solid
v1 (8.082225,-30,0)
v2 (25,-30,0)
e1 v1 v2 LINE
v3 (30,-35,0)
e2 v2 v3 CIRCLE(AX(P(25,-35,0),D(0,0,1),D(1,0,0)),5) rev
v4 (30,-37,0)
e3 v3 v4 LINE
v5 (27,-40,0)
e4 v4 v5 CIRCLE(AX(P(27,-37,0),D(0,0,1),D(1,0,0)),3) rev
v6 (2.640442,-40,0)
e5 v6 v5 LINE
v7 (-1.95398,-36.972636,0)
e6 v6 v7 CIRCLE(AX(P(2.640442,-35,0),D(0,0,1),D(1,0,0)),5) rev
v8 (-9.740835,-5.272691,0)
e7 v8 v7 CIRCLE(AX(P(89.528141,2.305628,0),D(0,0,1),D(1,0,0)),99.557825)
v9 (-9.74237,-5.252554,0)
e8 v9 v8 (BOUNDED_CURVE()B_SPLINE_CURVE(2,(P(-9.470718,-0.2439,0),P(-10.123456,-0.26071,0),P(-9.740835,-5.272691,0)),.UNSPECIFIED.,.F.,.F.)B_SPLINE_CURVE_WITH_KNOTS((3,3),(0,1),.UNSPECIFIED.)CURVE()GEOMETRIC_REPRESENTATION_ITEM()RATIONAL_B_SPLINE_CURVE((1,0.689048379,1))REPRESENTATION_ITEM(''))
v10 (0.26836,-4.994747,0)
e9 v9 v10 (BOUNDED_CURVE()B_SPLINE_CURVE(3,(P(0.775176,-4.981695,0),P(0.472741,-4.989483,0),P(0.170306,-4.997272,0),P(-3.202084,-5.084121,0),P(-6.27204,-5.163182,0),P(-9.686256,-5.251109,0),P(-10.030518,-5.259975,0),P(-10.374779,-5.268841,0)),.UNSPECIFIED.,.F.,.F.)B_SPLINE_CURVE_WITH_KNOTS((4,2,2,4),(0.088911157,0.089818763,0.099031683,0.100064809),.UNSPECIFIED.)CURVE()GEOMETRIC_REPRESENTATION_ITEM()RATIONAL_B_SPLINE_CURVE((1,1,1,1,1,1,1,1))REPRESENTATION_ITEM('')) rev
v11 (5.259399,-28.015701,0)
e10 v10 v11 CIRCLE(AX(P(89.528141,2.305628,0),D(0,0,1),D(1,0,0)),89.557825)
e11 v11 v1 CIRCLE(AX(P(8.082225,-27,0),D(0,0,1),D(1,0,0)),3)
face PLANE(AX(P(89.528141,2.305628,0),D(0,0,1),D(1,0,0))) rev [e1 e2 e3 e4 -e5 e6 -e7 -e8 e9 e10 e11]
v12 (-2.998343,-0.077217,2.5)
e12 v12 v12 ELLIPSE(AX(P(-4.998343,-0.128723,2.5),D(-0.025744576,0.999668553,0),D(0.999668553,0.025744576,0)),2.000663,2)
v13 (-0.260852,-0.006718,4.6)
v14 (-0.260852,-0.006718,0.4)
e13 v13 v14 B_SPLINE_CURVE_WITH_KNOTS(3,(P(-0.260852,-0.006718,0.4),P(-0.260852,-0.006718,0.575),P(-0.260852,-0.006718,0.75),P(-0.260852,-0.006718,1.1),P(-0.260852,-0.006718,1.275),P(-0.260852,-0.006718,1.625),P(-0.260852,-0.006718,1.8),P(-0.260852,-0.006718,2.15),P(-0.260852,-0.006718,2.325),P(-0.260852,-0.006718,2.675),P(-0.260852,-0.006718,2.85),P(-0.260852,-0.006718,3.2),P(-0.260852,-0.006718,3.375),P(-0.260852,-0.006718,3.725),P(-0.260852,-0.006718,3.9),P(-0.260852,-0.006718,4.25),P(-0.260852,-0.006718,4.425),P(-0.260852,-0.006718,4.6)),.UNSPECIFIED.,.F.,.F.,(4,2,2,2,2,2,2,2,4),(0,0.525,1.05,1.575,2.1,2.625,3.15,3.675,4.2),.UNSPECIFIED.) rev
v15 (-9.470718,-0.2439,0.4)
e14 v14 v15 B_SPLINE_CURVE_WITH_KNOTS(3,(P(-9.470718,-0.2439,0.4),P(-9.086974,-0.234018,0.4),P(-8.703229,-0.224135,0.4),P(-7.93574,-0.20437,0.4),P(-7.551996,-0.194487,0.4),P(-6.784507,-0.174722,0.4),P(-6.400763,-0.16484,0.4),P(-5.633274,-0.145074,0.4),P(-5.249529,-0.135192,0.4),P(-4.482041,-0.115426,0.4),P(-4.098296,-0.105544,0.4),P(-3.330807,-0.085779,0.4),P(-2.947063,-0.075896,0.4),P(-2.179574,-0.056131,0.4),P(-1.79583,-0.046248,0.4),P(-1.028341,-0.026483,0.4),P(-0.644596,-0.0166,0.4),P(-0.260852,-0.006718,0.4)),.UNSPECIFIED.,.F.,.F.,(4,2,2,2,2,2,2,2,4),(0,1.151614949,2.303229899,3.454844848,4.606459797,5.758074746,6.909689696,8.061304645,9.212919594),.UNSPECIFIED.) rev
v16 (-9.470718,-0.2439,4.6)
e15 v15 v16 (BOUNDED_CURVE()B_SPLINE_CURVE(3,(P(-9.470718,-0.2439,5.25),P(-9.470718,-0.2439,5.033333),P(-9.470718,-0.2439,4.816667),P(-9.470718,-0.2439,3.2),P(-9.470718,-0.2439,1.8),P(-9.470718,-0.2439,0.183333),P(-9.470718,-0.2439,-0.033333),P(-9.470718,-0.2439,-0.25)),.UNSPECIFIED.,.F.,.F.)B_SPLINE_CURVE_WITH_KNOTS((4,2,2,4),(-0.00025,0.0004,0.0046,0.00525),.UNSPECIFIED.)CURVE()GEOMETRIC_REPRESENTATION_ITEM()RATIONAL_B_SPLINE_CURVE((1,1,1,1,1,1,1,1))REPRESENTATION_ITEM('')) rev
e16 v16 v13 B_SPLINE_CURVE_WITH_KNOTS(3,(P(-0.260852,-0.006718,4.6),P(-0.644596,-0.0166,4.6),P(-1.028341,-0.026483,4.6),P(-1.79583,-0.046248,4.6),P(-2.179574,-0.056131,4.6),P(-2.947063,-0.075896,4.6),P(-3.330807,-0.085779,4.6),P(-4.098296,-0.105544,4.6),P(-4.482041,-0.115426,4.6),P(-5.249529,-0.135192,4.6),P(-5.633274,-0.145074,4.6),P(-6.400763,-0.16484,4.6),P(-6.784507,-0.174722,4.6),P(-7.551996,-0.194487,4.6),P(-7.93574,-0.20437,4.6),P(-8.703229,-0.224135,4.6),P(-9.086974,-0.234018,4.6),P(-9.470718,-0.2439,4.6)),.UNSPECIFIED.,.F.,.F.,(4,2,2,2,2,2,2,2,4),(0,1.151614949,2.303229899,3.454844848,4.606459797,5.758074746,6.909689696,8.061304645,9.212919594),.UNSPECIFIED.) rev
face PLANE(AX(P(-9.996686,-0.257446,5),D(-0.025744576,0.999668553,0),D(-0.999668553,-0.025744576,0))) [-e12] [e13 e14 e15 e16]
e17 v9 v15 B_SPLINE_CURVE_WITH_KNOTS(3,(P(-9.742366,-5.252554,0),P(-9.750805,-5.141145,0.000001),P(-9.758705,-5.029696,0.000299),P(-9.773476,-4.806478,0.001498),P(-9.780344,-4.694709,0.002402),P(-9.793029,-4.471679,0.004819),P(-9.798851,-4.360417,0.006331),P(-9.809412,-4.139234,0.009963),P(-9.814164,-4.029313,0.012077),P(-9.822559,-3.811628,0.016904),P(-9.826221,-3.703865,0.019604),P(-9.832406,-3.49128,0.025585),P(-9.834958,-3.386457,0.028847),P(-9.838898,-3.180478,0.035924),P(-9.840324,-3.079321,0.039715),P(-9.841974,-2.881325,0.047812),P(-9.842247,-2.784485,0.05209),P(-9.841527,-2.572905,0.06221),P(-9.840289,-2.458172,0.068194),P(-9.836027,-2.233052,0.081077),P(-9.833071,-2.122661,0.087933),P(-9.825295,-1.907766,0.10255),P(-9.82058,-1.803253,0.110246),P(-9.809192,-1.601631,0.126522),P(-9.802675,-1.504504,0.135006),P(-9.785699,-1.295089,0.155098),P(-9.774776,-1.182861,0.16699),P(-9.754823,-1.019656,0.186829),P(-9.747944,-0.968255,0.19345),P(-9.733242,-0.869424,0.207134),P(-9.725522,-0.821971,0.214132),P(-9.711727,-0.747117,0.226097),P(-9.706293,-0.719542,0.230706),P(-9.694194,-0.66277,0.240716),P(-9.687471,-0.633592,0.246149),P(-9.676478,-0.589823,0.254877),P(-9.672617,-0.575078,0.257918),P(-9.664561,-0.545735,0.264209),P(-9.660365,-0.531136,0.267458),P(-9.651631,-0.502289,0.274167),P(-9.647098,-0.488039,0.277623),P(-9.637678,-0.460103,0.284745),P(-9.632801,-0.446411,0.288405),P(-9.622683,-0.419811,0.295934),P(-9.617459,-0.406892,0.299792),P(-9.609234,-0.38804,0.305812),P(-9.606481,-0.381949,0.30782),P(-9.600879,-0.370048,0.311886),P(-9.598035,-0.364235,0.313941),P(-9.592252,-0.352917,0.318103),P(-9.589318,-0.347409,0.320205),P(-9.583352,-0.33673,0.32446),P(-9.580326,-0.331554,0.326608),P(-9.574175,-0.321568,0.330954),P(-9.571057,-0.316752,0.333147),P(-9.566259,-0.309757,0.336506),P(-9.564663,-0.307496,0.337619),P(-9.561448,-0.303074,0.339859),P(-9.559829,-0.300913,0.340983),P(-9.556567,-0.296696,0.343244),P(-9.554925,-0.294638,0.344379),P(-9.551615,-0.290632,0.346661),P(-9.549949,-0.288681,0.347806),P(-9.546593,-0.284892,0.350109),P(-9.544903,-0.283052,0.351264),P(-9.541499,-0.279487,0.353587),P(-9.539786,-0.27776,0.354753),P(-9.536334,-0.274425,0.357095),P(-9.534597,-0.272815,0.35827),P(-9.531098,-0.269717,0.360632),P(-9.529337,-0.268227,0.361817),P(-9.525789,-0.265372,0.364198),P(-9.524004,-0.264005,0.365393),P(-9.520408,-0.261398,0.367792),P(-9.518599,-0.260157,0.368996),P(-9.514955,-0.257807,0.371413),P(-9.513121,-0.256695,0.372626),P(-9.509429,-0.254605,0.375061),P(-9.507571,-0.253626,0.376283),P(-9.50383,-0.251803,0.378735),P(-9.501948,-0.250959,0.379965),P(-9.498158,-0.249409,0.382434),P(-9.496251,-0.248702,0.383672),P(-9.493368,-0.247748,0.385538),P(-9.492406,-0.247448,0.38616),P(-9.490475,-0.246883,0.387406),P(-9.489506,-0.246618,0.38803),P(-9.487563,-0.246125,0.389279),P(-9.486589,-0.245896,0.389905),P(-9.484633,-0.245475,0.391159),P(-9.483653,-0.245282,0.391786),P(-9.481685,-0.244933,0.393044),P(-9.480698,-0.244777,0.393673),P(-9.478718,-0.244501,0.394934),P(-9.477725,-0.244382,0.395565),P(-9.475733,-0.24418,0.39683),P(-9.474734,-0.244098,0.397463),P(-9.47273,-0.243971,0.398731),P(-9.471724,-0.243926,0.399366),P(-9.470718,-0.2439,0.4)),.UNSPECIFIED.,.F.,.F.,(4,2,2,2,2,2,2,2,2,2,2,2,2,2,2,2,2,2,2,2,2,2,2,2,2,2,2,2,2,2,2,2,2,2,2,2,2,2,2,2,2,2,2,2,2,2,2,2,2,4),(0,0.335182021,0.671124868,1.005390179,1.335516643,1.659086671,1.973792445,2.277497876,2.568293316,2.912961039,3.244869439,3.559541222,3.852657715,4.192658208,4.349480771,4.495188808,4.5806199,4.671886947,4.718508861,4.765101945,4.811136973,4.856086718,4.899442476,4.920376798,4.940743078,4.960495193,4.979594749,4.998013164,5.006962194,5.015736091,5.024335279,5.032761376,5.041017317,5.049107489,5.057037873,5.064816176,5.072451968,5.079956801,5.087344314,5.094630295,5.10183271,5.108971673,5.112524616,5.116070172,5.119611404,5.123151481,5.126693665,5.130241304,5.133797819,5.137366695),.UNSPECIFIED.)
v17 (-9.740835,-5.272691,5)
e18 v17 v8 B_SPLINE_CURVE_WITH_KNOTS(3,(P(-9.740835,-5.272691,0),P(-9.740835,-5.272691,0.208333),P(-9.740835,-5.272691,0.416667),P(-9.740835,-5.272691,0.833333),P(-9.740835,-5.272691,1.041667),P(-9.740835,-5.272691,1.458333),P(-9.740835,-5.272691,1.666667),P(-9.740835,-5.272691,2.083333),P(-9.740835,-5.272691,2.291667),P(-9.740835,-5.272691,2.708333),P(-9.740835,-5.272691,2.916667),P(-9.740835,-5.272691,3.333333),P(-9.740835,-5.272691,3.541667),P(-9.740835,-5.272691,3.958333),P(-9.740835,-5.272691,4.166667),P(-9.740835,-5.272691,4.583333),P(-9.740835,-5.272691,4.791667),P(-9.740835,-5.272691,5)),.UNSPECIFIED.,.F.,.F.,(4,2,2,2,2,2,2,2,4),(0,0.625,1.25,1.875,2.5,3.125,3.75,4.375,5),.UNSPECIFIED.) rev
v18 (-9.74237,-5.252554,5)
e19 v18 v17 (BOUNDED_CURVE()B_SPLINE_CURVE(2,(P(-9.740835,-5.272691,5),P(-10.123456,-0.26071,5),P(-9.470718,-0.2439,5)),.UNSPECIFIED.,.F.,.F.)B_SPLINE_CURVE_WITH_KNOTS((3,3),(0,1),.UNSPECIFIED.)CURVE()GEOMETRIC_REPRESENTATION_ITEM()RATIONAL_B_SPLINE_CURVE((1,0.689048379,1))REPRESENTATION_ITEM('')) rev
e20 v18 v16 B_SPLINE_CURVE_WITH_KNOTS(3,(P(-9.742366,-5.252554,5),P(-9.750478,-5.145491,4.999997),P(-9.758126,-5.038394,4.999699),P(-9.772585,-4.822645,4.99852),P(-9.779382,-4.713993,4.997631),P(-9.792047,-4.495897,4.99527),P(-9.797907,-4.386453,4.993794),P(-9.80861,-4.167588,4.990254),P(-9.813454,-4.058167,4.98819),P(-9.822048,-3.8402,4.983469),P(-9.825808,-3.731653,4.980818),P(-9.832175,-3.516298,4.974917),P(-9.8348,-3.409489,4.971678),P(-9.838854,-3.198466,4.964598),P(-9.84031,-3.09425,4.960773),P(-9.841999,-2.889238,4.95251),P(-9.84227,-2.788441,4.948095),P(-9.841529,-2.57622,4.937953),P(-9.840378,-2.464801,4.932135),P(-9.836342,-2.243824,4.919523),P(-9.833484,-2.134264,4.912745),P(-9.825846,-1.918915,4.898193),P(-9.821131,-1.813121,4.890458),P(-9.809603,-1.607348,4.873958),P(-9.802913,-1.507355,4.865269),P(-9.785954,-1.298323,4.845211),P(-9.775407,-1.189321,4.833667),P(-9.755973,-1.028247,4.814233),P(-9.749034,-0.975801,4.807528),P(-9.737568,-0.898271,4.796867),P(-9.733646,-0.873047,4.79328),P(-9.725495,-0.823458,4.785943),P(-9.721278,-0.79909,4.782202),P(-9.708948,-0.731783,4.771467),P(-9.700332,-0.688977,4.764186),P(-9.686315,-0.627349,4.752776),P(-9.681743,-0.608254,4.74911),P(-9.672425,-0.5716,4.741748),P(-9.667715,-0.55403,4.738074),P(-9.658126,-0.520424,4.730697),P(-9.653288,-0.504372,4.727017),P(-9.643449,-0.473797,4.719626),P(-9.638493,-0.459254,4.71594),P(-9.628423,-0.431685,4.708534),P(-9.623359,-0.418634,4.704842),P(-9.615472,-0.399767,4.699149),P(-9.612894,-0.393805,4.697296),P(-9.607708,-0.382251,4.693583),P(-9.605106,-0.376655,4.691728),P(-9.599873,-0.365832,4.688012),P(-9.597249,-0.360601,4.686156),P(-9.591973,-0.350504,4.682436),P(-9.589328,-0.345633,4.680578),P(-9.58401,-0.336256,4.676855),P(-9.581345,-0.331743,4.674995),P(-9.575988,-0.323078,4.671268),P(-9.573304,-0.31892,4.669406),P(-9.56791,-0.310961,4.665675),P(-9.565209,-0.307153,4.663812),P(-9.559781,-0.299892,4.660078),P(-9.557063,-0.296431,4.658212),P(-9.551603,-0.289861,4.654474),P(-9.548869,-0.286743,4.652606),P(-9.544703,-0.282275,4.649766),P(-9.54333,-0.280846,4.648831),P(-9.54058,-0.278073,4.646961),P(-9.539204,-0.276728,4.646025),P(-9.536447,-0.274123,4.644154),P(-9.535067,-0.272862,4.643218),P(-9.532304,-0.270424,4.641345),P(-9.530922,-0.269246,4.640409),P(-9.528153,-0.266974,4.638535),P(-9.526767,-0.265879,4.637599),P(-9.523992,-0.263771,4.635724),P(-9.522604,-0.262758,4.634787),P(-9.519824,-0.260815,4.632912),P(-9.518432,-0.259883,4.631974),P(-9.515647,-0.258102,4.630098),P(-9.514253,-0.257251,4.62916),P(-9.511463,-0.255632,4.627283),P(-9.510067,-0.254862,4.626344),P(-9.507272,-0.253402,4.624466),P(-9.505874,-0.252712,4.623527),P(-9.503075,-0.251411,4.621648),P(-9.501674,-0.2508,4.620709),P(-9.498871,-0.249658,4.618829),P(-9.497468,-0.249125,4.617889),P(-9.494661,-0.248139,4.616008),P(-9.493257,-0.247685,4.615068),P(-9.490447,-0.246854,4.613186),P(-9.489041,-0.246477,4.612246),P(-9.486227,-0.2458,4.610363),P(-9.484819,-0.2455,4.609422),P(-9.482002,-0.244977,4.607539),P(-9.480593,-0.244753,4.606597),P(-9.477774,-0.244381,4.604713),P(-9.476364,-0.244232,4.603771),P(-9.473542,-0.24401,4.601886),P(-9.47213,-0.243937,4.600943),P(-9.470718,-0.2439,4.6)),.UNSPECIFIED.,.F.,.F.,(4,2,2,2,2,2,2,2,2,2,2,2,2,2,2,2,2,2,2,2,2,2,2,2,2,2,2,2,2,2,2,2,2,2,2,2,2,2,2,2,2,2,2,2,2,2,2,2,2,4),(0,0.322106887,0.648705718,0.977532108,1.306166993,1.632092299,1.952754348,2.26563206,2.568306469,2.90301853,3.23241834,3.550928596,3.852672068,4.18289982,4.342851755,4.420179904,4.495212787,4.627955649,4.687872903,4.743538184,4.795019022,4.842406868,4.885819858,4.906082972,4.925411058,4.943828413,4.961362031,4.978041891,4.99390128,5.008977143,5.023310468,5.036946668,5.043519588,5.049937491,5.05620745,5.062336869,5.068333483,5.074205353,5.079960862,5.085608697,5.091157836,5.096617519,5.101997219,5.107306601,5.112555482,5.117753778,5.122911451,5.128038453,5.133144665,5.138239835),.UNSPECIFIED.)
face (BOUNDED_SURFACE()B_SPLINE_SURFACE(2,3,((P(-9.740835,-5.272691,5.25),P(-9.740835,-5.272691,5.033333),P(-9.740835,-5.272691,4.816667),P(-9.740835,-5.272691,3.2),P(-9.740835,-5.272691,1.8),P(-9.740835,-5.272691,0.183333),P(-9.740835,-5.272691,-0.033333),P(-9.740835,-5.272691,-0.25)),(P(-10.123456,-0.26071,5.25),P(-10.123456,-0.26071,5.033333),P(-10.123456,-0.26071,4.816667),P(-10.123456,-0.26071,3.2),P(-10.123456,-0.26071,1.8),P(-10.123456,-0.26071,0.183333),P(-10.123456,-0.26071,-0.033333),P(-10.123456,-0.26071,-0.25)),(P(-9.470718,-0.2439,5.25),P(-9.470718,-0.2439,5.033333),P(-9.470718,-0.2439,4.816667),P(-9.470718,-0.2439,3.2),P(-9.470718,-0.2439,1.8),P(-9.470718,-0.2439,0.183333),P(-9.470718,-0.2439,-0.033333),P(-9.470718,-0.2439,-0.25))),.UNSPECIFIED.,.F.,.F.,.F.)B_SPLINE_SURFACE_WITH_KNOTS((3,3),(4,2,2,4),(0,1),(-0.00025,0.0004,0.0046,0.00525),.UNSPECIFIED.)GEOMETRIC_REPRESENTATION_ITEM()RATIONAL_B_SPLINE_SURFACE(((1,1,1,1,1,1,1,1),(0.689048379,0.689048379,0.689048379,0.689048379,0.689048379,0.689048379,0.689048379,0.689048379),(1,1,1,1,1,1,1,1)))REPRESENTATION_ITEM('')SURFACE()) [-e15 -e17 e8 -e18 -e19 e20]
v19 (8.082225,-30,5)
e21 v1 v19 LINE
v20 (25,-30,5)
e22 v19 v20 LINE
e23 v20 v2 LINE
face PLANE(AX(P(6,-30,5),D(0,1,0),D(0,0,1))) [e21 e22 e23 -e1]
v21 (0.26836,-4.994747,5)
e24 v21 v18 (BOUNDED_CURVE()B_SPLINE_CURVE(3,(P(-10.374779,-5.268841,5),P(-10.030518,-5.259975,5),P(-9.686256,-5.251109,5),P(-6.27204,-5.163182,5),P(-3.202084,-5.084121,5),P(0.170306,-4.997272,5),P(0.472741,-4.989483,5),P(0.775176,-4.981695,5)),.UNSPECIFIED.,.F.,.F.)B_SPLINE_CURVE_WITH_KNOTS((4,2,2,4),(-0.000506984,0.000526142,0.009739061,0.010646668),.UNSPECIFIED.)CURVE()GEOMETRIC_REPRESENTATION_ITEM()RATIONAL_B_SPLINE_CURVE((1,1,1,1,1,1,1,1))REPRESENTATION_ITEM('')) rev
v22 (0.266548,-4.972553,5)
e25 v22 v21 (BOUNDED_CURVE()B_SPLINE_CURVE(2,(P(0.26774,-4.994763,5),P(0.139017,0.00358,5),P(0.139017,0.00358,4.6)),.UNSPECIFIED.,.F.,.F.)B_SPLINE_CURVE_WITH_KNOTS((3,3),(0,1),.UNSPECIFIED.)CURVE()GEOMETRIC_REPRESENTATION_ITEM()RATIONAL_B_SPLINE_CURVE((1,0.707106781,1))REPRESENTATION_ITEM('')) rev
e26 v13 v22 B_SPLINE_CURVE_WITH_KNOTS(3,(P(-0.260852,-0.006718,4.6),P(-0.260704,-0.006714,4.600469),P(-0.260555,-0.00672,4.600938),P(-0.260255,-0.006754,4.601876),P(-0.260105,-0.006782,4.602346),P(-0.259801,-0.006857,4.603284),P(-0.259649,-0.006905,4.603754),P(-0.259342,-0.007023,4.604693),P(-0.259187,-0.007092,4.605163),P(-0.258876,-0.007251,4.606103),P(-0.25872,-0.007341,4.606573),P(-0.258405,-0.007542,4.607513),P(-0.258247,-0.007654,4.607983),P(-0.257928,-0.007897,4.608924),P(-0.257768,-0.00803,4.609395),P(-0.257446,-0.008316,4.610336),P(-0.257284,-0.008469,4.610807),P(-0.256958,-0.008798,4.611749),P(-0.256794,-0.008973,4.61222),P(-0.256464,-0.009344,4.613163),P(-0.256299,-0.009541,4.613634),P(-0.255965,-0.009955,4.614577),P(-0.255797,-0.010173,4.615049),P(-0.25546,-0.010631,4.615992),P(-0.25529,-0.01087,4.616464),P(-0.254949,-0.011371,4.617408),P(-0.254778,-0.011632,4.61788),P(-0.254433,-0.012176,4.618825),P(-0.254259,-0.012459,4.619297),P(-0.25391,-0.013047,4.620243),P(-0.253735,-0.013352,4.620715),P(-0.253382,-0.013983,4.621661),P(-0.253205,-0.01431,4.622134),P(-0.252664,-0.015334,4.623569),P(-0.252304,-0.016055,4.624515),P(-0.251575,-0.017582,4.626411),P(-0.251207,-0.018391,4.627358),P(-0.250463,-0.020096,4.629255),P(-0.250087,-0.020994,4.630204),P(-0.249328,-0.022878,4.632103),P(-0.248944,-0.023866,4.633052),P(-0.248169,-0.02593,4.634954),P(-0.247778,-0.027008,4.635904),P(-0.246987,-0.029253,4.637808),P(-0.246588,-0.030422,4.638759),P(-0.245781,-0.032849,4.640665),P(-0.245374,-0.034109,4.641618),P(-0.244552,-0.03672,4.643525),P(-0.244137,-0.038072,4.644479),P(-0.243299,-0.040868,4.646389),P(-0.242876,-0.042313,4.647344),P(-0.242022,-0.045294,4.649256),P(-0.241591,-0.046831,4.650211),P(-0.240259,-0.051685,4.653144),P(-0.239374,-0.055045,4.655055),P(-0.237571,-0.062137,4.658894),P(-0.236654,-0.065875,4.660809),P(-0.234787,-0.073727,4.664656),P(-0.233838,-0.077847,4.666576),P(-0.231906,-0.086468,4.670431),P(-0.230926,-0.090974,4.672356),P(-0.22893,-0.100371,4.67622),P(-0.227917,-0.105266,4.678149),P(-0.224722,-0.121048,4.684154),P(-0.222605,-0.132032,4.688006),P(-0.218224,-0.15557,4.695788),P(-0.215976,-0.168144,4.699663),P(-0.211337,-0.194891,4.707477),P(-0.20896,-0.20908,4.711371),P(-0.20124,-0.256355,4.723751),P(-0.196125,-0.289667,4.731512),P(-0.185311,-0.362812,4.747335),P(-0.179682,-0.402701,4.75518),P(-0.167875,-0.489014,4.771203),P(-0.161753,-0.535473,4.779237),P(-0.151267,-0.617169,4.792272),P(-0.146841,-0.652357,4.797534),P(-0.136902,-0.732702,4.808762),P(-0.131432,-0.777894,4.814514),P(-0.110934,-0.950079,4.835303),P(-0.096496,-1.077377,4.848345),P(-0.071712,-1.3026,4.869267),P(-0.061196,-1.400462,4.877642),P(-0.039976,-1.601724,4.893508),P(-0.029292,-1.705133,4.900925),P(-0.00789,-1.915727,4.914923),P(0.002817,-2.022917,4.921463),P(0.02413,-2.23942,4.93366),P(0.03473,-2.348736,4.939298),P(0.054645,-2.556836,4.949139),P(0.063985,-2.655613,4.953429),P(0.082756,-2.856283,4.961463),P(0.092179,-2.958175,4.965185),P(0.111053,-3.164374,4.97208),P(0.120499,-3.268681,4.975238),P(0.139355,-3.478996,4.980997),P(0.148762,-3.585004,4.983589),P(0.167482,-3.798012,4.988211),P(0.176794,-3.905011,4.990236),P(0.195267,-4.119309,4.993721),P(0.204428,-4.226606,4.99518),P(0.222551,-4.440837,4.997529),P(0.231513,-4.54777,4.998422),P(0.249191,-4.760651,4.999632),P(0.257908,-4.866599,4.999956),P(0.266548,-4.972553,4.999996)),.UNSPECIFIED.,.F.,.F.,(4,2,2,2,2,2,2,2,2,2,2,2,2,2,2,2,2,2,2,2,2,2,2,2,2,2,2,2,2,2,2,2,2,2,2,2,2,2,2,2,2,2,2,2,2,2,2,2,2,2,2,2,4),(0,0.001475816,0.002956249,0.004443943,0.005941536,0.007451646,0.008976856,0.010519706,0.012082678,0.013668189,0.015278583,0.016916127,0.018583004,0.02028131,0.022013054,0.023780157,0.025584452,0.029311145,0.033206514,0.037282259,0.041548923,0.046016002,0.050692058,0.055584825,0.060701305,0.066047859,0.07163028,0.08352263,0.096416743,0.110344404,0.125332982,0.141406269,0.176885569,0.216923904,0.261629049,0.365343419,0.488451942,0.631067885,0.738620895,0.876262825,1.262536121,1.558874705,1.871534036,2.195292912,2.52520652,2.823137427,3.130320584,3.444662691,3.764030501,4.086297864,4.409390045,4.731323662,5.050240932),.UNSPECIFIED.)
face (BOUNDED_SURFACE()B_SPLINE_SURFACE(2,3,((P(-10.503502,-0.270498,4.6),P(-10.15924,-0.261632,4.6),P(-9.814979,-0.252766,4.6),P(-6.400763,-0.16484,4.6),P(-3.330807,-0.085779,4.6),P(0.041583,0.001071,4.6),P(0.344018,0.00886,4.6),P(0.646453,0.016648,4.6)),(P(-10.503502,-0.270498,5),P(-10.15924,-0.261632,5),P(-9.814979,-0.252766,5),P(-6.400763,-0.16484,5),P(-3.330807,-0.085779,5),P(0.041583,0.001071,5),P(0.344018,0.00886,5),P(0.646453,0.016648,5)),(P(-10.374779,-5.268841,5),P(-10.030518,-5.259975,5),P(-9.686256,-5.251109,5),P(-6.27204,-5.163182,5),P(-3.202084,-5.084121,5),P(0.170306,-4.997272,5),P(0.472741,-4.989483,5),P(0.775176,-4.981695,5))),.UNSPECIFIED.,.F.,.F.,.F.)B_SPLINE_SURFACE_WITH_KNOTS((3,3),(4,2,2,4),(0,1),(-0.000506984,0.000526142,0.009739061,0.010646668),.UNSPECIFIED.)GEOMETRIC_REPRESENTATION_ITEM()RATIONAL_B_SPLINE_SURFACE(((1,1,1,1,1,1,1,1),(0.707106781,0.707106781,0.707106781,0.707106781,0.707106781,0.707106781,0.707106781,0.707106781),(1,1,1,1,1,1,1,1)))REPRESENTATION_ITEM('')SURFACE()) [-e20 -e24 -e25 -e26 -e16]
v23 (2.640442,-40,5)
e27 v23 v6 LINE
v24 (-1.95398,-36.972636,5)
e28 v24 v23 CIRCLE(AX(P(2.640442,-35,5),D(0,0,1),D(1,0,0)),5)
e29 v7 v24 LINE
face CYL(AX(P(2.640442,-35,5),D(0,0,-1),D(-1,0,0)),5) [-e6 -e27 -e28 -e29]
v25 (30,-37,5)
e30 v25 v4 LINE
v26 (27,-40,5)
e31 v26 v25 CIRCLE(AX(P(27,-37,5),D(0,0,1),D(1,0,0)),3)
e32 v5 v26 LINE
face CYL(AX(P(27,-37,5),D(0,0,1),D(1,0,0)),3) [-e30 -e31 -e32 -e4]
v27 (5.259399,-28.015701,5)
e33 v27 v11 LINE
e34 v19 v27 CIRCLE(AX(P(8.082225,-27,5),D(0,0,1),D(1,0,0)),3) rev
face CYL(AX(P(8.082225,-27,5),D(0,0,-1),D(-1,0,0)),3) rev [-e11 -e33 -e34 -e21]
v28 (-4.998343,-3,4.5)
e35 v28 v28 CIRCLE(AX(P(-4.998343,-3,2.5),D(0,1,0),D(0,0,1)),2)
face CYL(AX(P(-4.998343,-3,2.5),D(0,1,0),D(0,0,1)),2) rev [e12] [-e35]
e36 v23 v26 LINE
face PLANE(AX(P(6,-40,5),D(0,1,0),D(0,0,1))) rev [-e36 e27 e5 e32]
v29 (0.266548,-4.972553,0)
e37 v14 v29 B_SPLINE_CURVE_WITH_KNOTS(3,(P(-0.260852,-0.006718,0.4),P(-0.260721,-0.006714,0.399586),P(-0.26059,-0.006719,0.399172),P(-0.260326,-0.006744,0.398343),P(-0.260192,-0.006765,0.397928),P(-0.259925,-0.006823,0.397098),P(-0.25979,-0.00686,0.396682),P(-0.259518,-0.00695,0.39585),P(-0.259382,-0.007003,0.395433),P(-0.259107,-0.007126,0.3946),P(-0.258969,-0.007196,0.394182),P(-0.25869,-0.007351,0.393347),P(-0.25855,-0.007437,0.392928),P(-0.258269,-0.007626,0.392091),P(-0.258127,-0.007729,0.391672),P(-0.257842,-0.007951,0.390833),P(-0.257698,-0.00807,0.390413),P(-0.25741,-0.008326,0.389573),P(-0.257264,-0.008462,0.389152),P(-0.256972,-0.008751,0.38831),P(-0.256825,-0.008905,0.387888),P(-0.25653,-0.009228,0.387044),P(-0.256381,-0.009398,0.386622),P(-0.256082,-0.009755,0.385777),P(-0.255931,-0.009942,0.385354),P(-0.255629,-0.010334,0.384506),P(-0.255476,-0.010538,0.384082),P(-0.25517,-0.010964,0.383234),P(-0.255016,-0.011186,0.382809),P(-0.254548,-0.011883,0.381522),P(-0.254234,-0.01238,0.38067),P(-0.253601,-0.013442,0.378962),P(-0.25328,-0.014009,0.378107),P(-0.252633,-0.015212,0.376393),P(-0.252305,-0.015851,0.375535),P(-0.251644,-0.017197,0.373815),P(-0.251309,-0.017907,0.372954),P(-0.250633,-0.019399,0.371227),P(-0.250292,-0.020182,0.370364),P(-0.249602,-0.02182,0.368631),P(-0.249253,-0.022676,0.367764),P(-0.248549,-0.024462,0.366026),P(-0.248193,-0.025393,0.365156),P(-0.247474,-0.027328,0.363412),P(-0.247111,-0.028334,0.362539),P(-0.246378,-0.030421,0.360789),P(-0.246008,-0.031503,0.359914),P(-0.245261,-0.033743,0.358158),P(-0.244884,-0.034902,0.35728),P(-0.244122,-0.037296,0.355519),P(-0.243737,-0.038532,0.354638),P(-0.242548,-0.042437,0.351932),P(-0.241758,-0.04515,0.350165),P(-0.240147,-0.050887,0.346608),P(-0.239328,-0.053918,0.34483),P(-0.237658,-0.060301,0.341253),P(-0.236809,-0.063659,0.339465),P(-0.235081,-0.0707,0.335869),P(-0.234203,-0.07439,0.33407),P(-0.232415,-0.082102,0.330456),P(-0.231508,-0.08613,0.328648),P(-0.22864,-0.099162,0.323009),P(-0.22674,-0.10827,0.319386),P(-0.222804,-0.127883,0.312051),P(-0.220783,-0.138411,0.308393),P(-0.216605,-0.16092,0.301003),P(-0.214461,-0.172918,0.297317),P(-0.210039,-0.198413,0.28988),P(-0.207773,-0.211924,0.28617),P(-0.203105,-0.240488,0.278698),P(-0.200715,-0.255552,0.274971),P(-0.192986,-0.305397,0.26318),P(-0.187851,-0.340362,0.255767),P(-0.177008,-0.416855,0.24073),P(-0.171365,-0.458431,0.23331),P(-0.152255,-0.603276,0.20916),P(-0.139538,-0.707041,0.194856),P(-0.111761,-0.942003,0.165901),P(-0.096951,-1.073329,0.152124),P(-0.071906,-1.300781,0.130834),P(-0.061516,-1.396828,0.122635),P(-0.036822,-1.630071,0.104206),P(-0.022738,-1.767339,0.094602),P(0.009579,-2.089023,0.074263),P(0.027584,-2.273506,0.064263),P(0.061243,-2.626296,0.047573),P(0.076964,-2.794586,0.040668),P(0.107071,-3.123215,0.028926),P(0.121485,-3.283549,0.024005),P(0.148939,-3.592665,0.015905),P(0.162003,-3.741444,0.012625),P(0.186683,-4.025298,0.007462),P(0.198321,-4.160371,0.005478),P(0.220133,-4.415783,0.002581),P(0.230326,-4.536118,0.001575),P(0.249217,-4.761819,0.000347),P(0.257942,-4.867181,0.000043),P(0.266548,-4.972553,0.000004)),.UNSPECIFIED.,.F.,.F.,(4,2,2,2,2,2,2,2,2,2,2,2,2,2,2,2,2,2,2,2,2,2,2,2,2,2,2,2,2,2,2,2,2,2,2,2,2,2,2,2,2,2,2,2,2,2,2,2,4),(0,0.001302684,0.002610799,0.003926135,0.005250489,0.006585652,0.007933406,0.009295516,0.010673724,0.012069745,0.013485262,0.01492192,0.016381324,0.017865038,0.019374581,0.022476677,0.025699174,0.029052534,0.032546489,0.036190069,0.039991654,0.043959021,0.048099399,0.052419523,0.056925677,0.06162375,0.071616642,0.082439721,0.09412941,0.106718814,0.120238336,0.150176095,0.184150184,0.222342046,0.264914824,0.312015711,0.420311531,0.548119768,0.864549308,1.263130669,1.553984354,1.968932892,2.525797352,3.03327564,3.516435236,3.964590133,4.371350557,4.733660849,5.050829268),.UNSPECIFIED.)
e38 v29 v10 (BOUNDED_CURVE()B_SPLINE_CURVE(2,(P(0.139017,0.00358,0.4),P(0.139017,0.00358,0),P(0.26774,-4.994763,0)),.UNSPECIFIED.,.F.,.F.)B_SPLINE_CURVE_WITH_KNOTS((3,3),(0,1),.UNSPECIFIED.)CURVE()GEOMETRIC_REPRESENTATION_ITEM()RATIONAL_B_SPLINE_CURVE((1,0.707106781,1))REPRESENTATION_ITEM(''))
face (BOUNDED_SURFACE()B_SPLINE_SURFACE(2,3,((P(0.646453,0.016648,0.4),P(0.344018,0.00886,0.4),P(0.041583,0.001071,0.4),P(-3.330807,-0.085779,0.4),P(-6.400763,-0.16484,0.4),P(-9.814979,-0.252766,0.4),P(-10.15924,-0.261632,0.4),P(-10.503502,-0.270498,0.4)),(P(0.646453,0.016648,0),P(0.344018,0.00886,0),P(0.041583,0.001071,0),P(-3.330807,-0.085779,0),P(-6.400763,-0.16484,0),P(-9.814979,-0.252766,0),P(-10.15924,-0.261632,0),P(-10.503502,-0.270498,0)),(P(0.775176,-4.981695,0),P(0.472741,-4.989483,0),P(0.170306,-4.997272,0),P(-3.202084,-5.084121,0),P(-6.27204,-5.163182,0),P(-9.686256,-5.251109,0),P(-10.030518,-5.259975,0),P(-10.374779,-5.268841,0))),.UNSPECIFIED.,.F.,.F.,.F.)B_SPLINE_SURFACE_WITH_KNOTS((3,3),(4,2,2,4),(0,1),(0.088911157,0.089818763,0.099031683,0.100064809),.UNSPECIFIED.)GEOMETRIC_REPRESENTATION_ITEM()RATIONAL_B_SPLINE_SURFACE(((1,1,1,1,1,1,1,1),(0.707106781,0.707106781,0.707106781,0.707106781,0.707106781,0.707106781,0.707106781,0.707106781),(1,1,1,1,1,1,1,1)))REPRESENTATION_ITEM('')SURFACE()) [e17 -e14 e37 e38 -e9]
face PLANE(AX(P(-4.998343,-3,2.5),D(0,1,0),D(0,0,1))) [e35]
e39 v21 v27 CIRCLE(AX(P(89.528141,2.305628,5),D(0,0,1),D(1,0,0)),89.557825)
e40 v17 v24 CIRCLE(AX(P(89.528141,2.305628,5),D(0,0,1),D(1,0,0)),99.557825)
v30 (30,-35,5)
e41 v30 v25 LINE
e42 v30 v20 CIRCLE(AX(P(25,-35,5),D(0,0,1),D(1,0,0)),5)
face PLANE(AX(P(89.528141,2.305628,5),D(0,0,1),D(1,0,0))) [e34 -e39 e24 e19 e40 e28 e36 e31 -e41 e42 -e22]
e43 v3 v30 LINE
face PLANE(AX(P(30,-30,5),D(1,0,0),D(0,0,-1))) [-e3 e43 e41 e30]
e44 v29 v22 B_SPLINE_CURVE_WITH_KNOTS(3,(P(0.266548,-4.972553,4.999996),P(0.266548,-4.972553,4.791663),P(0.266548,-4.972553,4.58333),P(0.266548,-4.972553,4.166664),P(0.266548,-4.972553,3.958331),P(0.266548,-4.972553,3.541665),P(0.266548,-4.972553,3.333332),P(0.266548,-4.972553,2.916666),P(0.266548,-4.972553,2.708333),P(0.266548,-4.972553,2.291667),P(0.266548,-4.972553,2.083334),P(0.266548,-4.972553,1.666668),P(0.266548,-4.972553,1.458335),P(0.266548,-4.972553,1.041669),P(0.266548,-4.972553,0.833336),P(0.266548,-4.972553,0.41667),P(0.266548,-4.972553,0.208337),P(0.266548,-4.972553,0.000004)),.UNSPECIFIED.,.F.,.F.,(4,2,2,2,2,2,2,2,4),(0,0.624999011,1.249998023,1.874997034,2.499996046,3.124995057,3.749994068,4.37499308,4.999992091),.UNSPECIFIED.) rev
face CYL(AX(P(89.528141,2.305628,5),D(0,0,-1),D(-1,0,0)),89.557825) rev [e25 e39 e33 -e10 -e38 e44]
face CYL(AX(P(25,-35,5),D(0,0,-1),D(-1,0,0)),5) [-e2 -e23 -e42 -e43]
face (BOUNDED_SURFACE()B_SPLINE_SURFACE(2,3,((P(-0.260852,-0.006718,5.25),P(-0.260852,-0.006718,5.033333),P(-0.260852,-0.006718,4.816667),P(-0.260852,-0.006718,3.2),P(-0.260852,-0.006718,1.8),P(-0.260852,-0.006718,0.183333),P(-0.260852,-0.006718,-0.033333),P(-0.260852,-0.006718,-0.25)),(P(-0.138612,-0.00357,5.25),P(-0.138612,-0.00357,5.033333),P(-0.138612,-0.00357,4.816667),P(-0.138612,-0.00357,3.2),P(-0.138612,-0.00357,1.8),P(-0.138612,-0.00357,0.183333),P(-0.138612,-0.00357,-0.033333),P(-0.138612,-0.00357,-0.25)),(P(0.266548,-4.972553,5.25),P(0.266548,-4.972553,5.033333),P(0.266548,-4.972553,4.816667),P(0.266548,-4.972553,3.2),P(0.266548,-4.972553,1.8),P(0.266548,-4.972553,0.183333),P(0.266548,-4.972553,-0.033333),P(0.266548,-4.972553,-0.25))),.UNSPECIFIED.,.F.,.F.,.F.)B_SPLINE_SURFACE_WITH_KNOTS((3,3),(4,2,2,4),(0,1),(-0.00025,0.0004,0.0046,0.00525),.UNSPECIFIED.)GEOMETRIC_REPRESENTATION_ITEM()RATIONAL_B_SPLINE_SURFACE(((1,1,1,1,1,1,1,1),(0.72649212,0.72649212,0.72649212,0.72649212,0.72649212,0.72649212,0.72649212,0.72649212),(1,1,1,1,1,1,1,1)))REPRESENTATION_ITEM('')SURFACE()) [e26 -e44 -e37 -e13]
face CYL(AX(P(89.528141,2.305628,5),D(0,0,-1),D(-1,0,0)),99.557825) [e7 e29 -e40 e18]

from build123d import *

# Parameters (mm, degrees)
EXTRUDE_THIN1_DEPTH = 5
SKETCH2_R           = 2
CUT_EXTRUDE1_DEPTH  = 3
FILLET1_R           = 5
FILLET2_R           = 3
FILLET3_R           = 3
FILLET5_R           = 5


with BuildPart() as part:
    # Sketch1 → Extrude-Thin1 (new body)
    with BuildSketch(Plane.XY):
        with BuildLine():
            ThreePointArc((0, 0), (1.709468812, -15.258106238), (6, -30))
            Line((6, -30), (30, -30))
            Line((30, -30), (30, -40))
            Line((30, -40), (-0.59396654, -40))
            ThreePointArc((-0.59396654, -40), (-7.355075067, -20.616040357), (-9.996685535, -0.257445757))
            Line((-9.996685535, -0.257445757), (0, 0))
        make_face()
    extrude(amount=EXTRUDE_THIN1_DEPTH)

    # Sketch2 → Cut-Extrude1 (cut)
    with BuildSketch(Plane(origin=(0, 0, 0), x_dir=(1, 0, 0), z_dir=(0, 1, 0))):
        with Locations(Location((-4.998342767, -2.5, 0), (0, 0, 270))):
            Circle(SKETCH2_R)
    extrude(amount=-CUT_EXTRUDE1_DEPTH, mode=Mode.SUBTRACT)

    # Fillet1
    fillet1_edges = [part.edges().sort_by_distance(p)[0] for p in [
        (30, -30, 2.5),
    ]]
    fillet(fillet1_edges, radius=FILLET1_R)

    # Fillet2
    fillet2_edges = [part.edges().sort_by_distance(p)[0] for p in [
        (30, -40, 2.5),
    ]]
    fillet(fillet2_edges, radius=FILLET2_R)

    # Fillet3
    fillet3_edges = [part.edges().sort_by_distance(p)[0] for p in [
        (6, -30, 2.5),
    ]]
    fillet(fillet3_edges, radius=FILLET3_R)

    # Fillet4
    # a fillet whose section is not a circle: 5, 0.4 mm, written as the material it takes off along each edge (its section moved 0.00015 mm through the faces so that the kernel can cut it)
    with BuildSketch(Plane(origin=(-22.492542459, -0.579252954, 0), x_dir=(0.02574457573397758, -0.9996685530315923, -2.999999998649999e-05), z_dir=(0.9996685534814432, 0.025744575745562638, 0))) as fillet4_piece_1:
        with BuildLine():
            Bezier((5.000000002, 0), (-0.000149995, 0.000150004), (-0.000162, -0.399999995), weights=[1, 0.707106781, 1])
            Line((-0.000162, -0.399999995), (-0.100162, -0.399996995))
            ThreePointArc((-0.100162, -0.399996995), (-0.100006, -0.199997), (-0.1, 3e-06))
            Line((-0.1, 3e-06), (3e-06, 0.1))
            ThreePointArc((3e-06, 0.1), (2.500002999, 0.099925), (5.000003002, 0.1))
            Line((5.000003002, 0.1), (5.000000002, 0))
        make_face()
    extrude(amount=35.000000011, mode=Mode.SUBTRACT)
    with BuildSketch(Plane(origin=(-9.996685535, -0.257445757, -12.554427483), x_dir=(0.9996611732267645, 0.026029574389313356, 0), z_dir=(0, 0, 1))) as fillet4_piece_2:
        with BuildLine():
            Bezier((0.526141916, 0), (-0.126969786, 0.000186198), (0.12506971, -5.02021329), weights=[1, 0.689048379, 1])
            Line((0.12506971, -5.02021329), (0.02519549, -5.025227283))
            ThreePointArc((0.02519549, -5.025227283), (-0.069016975, -2.513387959), (-0.099999996, 2.8509e-05))
            Line((-0.099999996, 2.8509e-05), (2.8509e-05, 0.099999996))
            ThreePointArc((2.8509e-05, 0.099999996), (0.263099446, 0.099924996), (0.526170426, 0.099999996))
            Line((0.526170426, 0.099999996), (0.526141916, 0))
        make_face()
    extrude(amount=30.108854967, mode=Mode.SUBTRACT)
    with BuildSketch(Plane(origin=(-22.492542459, -0.579252954, 5), x_dir=(-9.654215225776052e-06, 0.00037487568119717526, -0.9999999296875075), z_dir=(0.9996685534814432, 0.025744575745562638, 0))) as fillet4_piece_3:
        with BuildLine():
            Bezier((0.400000028, 0), (-0.000149944, 0.000150056), (-0.002025, -4.999999592), weights=[1, 0.707106781, 1])
            Line((-0.002025, -4.999999592), (-0.102024993, -4.999962092))
            ThreePointArc((-0.102024993, -4.999962092), (-0.100937493, -2.499962324), (-0.099999993, 3.75e-05))
            Line((-0.099999993, 3.75e-05), (3.75e-05, 0.099999993))
            ThreePointArc((3.75e-05, 0.099999993), (0.200037486, 0.099924993), (0.400037528, 0.099999993))
            Line((0.400037528, 0.099999993), (0.400000028, 0))
        make_face()
    extrude(amount=35.000000011, mode=Mode.SUBTRACT)
    with BuildSketch(Plane(origin=(0, 0, -12.449220075), x_dir=(0.05355702462204362, -0.9985647926467435, 0), z_dir=(0, 0, 1))) as fillet4_piece_4:
        with BuildLine():
            Bezier((4.97968803, 0), (-0.004005059, -0.138457778), (-0.00741229, -0.260833255), weights=[1, 0.72649212, 1])
            Line((-0.00741229, -0.260833255), (-0.107373553, -0.25805009))
            ThreePointArc((-0.107373553, -0.25805009), (-0.103592437, -0.12763555), (-0.099961262, 0.002783165))
            Line((-0.099961262, 0.002783165), (0.002783165, 0.099961262))
            ThreePointArc((0.002783165, 0.099961262), (2.489845983, 0.065307551), (4.976910885, 0.09996143))
            Line((4.976910885, 0.09996143), (4.97968803, 0))
        make_face()
    extrude(amount=29.898440151, mode=Mode.SUBTRACT)

    # Fillet5
    fillet5_edges = [part.edges().sort_by_distance(p)[0] for p in [
        (-0.59396654, -40, 2.5),
    ]]
    fillet(fillet5_edges, radius=FILLET5_R)


solid = part.part
